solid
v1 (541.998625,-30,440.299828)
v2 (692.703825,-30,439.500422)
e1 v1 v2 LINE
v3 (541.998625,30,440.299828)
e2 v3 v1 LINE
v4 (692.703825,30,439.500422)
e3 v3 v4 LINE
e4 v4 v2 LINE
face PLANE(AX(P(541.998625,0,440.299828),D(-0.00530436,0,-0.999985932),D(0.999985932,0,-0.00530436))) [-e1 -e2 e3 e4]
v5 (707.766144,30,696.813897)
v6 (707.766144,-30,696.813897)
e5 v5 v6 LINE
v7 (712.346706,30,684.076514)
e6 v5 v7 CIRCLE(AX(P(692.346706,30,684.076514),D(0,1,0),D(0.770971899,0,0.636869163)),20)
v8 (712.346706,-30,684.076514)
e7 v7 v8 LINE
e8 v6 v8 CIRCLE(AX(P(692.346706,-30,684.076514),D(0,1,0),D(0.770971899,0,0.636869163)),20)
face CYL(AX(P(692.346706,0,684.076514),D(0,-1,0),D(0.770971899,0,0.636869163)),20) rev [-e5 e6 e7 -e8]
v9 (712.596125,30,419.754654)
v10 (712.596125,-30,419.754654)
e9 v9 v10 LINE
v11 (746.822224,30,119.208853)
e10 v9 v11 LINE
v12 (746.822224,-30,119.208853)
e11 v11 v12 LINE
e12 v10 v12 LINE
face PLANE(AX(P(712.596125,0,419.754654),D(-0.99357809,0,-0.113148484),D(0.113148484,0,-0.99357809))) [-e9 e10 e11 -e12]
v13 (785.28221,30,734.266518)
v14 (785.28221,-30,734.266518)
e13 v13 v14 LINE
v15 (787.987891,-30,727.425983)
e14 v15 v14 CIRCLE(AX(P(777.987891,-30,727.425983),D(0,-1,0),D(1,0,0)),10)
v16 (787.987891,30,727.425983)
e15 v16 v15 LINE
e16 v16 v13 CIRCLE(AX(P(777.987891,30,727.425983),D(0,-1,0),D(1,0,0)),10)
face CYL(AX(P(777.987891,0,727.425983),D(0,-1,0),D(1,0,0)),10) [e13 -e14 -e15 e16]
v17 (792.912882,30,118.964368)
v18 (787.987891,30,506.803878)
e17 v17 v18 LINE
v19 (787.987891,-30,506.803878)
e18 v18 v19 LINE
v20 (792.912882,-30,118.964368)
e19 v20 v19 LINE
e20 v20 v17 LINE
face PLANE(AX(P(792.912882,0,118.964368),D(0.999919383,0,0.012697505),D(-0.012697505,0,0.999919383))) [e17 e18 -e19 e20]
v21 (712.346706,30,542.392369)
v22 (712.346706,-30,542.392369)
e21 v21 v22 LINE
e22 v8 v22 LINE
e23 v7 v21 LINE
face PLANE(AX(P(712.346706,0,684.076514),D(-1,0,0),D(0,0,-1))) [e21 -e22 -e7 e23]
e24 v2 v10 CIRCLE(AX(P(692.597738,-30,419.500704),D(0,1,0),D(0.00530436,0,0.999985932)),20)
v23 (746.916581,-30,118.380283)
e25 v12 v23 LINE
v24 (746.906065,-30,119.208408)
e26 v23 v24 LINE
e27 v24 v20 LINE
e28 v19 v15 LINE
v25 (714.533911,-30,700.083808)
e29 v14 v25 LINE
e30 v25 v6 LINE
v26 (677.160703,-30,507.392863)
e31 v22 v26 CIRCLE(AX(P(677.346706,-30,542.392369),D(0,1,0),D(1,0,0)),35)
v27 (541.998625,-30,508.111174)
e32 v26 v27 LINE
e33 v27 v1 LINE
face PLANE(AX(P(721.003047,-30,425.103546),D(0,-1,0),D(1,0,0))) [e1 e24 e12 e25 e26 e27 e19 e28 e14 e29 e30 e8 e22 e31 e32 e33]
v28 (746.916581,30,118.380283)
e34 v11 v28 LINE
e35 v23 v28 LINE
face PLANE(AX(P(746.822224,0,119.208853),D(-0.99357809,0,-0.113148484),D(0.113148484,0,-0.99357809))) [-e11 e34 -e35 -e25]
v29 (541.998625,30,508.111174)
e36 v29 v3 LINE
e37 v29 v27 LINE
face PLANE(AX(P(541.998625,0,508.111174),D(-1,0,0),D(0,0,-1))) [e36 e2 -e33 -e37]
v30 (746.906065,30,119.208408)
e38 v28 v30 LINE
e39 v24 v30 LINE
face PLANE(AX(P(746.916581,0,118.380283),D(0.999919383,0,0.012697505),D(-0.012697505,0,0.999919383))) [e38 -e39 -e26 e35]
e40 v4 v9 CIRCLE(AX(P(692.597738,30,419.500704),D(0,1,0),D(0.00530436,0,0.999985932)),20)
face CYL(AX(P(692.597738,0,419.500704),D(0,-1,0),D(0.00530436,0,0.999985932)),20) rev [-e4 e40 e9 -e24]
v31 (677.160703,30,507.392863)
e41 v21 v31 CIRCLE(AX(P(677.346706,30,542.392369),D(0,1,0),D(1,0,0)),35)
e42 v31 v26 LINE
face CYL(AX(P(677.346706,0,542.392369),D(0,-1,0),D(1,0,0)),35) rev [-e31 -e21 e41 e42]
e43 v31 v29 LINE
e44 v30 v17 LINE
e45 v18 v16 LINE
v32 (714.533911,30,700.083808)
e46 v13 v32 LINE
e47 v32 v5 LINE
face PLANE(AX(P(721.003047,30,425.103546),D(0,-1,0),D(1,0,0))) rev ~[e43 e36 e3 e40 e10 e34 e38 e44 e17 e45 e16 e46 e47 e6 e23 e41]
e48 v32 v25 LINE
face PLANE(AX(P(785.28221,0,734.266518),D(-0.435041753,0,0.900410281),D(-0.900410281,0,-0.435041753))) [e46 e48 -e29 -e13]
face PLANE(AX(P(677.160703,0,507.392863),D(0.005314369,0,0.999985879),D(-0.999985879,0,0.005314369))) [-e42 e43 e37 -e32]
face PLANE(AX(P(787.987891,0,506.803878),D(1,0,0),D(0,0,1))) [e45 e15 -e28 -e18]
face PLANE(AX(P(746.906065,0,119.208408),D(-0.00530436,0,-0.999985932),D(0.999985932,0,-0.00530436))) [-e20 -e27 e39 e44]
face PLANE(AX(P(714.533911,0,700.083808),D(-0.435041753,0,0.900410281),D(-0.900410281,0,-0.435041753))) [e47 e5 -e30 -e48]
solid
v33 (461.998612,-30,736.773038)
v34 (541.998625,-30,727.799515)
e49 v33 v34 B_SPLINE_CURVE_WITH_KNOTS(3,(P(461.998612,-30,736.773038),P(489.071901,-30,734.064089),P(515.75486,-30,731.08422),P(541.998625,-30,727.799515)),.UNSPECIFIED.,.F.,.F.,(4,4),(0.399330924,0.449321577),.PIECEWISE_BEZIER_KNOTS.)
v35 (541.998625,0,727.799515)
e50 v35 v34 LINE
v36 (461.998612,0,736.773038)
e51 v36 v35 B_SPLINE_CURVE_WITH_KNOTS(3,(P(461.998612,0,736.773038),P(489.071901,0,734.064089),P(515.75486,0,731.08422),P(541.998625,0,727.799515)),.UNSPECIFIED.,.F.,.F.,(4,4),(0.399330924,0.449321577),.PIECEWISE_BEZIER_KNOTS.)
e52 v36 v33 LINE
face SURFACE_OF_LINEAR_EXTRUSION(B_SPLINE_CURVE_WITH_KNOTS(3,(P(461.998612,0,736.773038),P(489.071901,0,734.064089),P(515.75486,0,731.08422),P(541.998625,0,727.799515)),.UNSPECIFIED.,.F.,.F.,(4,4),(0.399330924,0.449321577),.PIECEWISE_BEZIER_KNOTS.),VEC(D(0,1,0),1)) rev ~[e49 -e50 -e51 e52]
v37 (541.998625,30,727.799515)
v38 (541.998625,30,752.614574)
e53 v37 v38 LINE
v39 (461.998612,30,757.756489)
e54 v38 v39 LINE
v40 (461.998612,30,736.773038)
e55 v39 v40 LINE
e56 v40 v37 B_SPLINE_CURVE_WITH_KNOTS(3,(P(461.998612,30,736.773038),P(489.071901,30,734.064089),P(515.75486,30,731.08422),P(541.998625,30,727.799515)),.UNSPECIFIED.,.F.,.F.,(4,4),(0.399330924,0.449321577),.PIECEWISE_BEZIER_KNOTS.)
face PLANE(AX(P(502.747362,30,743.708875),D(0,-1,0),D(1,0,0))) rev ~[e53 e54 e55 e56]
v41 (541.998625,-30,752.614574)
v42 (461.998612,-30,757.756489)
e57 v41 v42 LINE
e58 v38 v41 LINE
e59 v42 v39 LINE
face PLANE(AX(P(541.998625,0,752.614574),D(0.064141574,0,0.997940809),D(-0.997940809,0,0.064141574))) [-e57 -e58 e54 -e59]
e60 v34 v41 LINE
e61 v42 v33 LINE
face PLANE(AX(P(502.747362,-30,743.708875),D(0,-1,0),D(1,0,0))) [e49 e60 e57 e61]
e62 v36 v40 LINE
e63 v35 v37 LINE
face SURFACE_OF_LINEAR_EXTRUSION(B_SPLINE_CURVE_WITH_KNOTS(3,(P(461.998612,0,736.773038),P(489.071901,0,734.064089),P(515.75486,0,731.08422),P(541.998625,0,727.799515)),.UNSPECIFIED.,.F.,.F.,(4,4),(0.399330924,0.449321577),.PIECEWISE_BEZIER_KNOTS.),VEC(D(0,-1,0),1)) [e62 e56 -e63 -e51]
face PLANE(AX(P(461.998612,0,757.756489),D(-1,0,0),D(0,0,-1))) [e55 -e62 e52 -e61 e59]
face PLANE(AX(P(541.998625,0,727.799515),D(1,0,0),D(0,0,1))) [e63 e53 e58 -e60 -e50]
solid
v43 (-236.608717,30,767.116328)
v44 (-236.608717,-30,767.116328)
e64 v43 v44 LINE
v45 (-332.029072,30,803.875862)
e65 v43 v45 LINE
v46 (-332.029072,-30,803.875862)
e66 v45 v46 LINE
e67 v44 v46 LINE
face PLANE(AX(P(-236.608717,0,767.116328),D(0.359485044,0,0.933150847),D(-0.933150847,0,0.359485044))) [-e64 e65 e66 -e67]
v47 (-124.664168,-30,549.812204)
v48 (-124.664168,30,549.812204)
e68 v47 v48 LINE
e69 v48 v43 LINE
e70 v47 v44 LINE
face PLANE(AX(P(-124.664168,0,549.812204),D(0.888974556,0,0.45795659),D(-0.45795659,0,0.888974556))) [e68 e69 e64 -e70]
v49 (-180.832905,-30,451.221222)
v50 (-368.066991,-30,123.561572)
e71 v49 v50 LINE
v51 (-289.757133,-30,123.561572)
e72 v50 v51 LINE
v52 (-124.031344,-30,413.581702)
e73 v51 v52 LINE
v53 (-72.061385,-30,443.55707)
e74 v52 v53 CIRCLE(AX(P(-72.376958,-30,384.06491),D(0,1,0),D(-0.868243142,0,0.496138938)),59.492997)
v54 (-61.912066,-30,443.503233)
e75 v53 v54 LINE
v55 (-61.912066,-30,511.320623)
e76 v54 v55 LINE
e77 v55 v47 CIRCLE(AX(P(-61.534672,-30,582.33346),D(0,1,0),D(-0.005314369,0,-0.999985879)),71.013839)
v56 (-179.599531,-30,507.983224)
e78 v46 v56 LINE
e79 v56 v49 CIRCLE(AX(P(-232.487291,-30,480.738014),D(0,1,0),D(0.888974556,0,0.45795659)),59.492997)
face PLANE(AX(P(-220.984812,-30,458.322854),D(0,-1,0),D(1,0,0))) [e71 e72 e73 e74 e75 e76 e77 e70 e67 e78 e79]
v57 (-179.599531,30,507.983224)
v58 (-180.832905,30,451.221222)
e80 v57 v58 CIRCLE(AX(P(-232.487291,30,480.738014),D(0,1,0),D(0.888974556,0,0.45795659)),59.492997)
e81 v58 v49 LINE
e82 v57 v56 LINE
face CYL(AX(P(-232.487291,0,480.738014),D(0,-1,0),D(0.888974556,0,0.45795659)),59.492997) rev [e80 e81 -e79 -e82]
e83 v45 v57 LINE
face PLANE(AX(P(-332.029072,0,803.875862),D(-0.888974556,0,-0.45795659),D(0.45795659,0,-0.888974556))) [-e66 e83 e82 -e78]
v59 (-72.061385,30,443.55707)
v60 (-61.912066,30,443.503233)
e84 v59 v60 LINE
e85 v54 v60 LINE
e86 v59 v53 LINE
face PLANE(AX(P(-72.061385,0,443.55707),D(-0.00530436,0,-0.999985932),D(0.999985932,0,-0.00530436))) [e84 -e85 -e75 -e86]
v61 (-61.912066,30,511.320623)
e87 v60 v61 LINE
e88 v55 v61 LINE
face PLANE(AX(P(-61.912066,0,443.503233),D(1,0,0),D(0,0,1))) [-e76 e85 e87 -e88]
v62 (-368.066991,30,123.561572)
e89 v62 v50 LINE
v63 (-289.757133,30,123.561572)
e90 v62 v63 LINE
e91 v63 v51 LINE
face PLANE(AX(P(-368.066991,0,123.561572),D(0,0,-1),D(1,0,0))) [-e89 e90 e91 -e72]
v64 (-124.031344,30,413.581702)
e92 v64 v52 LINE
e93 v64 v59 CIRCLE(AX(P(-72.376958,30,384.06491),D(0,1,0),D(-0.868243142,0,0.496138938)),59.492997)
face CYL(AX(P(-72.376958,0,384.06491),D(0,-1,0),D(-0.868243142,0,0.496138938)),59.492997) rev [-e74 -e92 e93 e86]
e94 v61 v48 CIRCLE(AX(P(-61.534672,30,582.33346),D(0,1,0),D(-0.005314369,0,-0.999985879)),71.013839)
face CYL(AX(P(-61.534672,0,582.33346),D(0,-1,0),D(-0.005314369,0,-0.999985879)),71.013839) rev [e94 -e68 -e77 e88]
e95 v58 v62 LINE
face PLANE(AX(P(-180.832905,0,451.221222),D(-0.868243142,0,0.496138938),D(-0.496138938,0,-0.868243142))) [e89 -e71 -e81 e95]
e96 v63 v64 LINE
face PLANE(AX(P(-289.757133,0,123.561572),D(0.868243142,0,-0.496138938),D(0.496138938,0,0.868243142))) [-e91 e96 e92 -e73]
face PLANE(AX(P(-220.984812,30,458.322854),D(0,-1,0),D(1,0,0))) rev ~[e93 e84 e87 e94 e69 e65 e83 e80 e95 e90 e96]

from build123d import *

# Parameters (mm, degrees)
F1_DEPTH = 30


with BuildPart() as f1:
    # F0 (on Front) → F1 (new body, symmetric)
    with BuildSketch(Plane.XZ):
        with BuildLine():
            Line((792.9128824881, 118.9643679948), (787.9878913216, 506.8038779257))
            Line((787.9878913216, 506.8038779257), (787.9878913216, 683.6658184119))
            add(Edge.make_bspline(
                [(714.5339111446, 700.0838076709), (739.5925972645, 695.0095645709), (764.0533999142, 689.5203425349), (787.9878913215, 683.6658184119)],
                knots=[0.5636173816, 0.5636173816, 0.5636173816, 0.5636173816, 0.6158564512, 0.6158564512, 0.6158564512, 0.6158564512], degree=3))
            Line((714.5339111446, 700.0838076709), (707.766144209, 696.8138969939))
            ThreePointArc((707.766144209, 696.8138969939), (711.16675882, 690.8444986797), (712.3467062191, 684.0765137432))
            Line((712.3467062191, 684.0765137432), (712.3467062191, 542.3923685329))
            ThreePointArc((712.3467062191, 542.3923685329), (702.0295939995, 517.5779563734), (677.1607033152, 507.3928627804))
            Line((677.1607033152, 507.3928627804), (541.9986248016, 508.1111740414))
            Line((541.9986248016, 508.1111740414), (541.9986248016, 477.4119283793))
            Line((541.9986248016, 477.4119283793), (541.9986248016, 440.2998282791))
            Line((541.9986248016, 440.2998282791), (692.7038248536, 439.500422329))
            ThreePointArc((692.7038248536, 439.500422329), (706.6874970919, 433.6950222298), (712.5961253131, 419.7546537941))
            Line((712.5961253131, 419.7546537941), (746.8222238447, 119.2088529014))
            Line((746.8222238447, 119.2088529014), (746.9060652922, 119.2084081699))
            Line((746.9060652922, 119.2084081699), (792.9128824881, 118.9643679948))
        make_face()
        with BuildLine():
            add(Edge.make_bspline(
                [(714.5339111446, 700.0838076709), (739.5925972645, 695.0095645709), (764.0533999142, 689.5203425349), (787.9878913215, 683.6658184119)],
                knots=[0.5636173816, 0.5636173816, 0.5636173816, 0.5636173816, 0.6158564512, 0.6158564512, 0.6158564512, 0.6158564512], degree=3))
            Line((787.9878913216, 683.6658184119), (787.9878913216, 727.4259827856))
            ThreePointArc((787.9878913216, 727.4259827856), (787.2869015502, 731.1040813117), (785.2822095679, 734.2665179489))
            Line((785.2822095679, 734.2665179489), (714.5339111446, 700.0838076709))
        make_face()
        Polygon((746.916581268, 118.3802826414), (746.9060652922, 119.2084081699), (746.8222238447, 119.2088529014), align=None)
    extrude(amount=F1_DEPTH, both=True)


with BuildPart() as f1b:
    # F0 (on Front) → F1, piece 2 (new body, symmetric)
    with BuildSketch(Plane.XZ):
        with BuildLine():
            add(Edge.make_bspline(
                [(461.9986116886, 736.7730380501), (489.0719013944, 734.0640894482), (515.7548604152, 731.0842201394), (541.9986248016, 727.7995146356)],
                knots=[0.3993309236, 0.3993309236, 0.3993309236, 0.3993309236, 0.4493215774, 0.4493215774, 0.4493215774, 0.4493215774], degree=3))
            Line((541.9986248016, 727.7995146356), (541.9986248016, 752.614573807))
            Line((541.9986248016, 752.614573807), (461.9986116886, 757.7564887194))
            Line((461.9986116886, 757.7564887194), (461.9986116886, 736.7730380501))
        make_face()
    extrude(amount=F1_DEPTH, both=True)


with BuildPart() as f1c:
    # F0 (on Front) → F1, piece 3 (new body, symmetric)
    with BuildSketch(Plane.XZ):
        with BuildLine():
            Line((-124.6641682472, 549.8122041474), (-236.6087170305, 767.1163282575))
            Line((-236.6087170305, 767.1163282575), (-332.0290716681, 803.8758623378))
            Line((-332.0290716686, 803.8758623375), (-179.5995307623, 507.9832241058))
            ThreePointArc((-179.5995307623, 507.9832241058), (-173.0083340294, 479.445603769), (-180.8329047313, 451.2212217175))
            Line((-180.8329047313, 451.2212217175), (-368.0669905303, 123.5615715693))
            Line((-368.0669905303, 123.5615715693), (-289.7571332166, 123.5615715693))
            Line((-289.7571332166, 123.5615715693), (-124.031344359, 413.5817020702))
            ThreePointArc((-124.031344359, 413.5817020702), (-102.1015120603, 435.6000196795), (-72.0613854071, 443.5570697393))
            Line((-72.0613854071, 443.5570697393), (-61.9120658447, 443.5032333325))
            Line((-61.9120658447, 443.5032333325), (-61.9120658447, 477.4119283793))
            Line((-61.9120658447, 477.4119283793), (-61.9120658447, 511.3206234261))
            ThreePointArc((-61.9120658447, 511.3206234261), (-98.6652755529, 521.8001330848), (-124.6641682472, 549.8122041474))
        make_face()
    extrude(amount=F1_DEPTH, both=True)


solid = Compound([f1.part, f1b.part, f1c.part])
